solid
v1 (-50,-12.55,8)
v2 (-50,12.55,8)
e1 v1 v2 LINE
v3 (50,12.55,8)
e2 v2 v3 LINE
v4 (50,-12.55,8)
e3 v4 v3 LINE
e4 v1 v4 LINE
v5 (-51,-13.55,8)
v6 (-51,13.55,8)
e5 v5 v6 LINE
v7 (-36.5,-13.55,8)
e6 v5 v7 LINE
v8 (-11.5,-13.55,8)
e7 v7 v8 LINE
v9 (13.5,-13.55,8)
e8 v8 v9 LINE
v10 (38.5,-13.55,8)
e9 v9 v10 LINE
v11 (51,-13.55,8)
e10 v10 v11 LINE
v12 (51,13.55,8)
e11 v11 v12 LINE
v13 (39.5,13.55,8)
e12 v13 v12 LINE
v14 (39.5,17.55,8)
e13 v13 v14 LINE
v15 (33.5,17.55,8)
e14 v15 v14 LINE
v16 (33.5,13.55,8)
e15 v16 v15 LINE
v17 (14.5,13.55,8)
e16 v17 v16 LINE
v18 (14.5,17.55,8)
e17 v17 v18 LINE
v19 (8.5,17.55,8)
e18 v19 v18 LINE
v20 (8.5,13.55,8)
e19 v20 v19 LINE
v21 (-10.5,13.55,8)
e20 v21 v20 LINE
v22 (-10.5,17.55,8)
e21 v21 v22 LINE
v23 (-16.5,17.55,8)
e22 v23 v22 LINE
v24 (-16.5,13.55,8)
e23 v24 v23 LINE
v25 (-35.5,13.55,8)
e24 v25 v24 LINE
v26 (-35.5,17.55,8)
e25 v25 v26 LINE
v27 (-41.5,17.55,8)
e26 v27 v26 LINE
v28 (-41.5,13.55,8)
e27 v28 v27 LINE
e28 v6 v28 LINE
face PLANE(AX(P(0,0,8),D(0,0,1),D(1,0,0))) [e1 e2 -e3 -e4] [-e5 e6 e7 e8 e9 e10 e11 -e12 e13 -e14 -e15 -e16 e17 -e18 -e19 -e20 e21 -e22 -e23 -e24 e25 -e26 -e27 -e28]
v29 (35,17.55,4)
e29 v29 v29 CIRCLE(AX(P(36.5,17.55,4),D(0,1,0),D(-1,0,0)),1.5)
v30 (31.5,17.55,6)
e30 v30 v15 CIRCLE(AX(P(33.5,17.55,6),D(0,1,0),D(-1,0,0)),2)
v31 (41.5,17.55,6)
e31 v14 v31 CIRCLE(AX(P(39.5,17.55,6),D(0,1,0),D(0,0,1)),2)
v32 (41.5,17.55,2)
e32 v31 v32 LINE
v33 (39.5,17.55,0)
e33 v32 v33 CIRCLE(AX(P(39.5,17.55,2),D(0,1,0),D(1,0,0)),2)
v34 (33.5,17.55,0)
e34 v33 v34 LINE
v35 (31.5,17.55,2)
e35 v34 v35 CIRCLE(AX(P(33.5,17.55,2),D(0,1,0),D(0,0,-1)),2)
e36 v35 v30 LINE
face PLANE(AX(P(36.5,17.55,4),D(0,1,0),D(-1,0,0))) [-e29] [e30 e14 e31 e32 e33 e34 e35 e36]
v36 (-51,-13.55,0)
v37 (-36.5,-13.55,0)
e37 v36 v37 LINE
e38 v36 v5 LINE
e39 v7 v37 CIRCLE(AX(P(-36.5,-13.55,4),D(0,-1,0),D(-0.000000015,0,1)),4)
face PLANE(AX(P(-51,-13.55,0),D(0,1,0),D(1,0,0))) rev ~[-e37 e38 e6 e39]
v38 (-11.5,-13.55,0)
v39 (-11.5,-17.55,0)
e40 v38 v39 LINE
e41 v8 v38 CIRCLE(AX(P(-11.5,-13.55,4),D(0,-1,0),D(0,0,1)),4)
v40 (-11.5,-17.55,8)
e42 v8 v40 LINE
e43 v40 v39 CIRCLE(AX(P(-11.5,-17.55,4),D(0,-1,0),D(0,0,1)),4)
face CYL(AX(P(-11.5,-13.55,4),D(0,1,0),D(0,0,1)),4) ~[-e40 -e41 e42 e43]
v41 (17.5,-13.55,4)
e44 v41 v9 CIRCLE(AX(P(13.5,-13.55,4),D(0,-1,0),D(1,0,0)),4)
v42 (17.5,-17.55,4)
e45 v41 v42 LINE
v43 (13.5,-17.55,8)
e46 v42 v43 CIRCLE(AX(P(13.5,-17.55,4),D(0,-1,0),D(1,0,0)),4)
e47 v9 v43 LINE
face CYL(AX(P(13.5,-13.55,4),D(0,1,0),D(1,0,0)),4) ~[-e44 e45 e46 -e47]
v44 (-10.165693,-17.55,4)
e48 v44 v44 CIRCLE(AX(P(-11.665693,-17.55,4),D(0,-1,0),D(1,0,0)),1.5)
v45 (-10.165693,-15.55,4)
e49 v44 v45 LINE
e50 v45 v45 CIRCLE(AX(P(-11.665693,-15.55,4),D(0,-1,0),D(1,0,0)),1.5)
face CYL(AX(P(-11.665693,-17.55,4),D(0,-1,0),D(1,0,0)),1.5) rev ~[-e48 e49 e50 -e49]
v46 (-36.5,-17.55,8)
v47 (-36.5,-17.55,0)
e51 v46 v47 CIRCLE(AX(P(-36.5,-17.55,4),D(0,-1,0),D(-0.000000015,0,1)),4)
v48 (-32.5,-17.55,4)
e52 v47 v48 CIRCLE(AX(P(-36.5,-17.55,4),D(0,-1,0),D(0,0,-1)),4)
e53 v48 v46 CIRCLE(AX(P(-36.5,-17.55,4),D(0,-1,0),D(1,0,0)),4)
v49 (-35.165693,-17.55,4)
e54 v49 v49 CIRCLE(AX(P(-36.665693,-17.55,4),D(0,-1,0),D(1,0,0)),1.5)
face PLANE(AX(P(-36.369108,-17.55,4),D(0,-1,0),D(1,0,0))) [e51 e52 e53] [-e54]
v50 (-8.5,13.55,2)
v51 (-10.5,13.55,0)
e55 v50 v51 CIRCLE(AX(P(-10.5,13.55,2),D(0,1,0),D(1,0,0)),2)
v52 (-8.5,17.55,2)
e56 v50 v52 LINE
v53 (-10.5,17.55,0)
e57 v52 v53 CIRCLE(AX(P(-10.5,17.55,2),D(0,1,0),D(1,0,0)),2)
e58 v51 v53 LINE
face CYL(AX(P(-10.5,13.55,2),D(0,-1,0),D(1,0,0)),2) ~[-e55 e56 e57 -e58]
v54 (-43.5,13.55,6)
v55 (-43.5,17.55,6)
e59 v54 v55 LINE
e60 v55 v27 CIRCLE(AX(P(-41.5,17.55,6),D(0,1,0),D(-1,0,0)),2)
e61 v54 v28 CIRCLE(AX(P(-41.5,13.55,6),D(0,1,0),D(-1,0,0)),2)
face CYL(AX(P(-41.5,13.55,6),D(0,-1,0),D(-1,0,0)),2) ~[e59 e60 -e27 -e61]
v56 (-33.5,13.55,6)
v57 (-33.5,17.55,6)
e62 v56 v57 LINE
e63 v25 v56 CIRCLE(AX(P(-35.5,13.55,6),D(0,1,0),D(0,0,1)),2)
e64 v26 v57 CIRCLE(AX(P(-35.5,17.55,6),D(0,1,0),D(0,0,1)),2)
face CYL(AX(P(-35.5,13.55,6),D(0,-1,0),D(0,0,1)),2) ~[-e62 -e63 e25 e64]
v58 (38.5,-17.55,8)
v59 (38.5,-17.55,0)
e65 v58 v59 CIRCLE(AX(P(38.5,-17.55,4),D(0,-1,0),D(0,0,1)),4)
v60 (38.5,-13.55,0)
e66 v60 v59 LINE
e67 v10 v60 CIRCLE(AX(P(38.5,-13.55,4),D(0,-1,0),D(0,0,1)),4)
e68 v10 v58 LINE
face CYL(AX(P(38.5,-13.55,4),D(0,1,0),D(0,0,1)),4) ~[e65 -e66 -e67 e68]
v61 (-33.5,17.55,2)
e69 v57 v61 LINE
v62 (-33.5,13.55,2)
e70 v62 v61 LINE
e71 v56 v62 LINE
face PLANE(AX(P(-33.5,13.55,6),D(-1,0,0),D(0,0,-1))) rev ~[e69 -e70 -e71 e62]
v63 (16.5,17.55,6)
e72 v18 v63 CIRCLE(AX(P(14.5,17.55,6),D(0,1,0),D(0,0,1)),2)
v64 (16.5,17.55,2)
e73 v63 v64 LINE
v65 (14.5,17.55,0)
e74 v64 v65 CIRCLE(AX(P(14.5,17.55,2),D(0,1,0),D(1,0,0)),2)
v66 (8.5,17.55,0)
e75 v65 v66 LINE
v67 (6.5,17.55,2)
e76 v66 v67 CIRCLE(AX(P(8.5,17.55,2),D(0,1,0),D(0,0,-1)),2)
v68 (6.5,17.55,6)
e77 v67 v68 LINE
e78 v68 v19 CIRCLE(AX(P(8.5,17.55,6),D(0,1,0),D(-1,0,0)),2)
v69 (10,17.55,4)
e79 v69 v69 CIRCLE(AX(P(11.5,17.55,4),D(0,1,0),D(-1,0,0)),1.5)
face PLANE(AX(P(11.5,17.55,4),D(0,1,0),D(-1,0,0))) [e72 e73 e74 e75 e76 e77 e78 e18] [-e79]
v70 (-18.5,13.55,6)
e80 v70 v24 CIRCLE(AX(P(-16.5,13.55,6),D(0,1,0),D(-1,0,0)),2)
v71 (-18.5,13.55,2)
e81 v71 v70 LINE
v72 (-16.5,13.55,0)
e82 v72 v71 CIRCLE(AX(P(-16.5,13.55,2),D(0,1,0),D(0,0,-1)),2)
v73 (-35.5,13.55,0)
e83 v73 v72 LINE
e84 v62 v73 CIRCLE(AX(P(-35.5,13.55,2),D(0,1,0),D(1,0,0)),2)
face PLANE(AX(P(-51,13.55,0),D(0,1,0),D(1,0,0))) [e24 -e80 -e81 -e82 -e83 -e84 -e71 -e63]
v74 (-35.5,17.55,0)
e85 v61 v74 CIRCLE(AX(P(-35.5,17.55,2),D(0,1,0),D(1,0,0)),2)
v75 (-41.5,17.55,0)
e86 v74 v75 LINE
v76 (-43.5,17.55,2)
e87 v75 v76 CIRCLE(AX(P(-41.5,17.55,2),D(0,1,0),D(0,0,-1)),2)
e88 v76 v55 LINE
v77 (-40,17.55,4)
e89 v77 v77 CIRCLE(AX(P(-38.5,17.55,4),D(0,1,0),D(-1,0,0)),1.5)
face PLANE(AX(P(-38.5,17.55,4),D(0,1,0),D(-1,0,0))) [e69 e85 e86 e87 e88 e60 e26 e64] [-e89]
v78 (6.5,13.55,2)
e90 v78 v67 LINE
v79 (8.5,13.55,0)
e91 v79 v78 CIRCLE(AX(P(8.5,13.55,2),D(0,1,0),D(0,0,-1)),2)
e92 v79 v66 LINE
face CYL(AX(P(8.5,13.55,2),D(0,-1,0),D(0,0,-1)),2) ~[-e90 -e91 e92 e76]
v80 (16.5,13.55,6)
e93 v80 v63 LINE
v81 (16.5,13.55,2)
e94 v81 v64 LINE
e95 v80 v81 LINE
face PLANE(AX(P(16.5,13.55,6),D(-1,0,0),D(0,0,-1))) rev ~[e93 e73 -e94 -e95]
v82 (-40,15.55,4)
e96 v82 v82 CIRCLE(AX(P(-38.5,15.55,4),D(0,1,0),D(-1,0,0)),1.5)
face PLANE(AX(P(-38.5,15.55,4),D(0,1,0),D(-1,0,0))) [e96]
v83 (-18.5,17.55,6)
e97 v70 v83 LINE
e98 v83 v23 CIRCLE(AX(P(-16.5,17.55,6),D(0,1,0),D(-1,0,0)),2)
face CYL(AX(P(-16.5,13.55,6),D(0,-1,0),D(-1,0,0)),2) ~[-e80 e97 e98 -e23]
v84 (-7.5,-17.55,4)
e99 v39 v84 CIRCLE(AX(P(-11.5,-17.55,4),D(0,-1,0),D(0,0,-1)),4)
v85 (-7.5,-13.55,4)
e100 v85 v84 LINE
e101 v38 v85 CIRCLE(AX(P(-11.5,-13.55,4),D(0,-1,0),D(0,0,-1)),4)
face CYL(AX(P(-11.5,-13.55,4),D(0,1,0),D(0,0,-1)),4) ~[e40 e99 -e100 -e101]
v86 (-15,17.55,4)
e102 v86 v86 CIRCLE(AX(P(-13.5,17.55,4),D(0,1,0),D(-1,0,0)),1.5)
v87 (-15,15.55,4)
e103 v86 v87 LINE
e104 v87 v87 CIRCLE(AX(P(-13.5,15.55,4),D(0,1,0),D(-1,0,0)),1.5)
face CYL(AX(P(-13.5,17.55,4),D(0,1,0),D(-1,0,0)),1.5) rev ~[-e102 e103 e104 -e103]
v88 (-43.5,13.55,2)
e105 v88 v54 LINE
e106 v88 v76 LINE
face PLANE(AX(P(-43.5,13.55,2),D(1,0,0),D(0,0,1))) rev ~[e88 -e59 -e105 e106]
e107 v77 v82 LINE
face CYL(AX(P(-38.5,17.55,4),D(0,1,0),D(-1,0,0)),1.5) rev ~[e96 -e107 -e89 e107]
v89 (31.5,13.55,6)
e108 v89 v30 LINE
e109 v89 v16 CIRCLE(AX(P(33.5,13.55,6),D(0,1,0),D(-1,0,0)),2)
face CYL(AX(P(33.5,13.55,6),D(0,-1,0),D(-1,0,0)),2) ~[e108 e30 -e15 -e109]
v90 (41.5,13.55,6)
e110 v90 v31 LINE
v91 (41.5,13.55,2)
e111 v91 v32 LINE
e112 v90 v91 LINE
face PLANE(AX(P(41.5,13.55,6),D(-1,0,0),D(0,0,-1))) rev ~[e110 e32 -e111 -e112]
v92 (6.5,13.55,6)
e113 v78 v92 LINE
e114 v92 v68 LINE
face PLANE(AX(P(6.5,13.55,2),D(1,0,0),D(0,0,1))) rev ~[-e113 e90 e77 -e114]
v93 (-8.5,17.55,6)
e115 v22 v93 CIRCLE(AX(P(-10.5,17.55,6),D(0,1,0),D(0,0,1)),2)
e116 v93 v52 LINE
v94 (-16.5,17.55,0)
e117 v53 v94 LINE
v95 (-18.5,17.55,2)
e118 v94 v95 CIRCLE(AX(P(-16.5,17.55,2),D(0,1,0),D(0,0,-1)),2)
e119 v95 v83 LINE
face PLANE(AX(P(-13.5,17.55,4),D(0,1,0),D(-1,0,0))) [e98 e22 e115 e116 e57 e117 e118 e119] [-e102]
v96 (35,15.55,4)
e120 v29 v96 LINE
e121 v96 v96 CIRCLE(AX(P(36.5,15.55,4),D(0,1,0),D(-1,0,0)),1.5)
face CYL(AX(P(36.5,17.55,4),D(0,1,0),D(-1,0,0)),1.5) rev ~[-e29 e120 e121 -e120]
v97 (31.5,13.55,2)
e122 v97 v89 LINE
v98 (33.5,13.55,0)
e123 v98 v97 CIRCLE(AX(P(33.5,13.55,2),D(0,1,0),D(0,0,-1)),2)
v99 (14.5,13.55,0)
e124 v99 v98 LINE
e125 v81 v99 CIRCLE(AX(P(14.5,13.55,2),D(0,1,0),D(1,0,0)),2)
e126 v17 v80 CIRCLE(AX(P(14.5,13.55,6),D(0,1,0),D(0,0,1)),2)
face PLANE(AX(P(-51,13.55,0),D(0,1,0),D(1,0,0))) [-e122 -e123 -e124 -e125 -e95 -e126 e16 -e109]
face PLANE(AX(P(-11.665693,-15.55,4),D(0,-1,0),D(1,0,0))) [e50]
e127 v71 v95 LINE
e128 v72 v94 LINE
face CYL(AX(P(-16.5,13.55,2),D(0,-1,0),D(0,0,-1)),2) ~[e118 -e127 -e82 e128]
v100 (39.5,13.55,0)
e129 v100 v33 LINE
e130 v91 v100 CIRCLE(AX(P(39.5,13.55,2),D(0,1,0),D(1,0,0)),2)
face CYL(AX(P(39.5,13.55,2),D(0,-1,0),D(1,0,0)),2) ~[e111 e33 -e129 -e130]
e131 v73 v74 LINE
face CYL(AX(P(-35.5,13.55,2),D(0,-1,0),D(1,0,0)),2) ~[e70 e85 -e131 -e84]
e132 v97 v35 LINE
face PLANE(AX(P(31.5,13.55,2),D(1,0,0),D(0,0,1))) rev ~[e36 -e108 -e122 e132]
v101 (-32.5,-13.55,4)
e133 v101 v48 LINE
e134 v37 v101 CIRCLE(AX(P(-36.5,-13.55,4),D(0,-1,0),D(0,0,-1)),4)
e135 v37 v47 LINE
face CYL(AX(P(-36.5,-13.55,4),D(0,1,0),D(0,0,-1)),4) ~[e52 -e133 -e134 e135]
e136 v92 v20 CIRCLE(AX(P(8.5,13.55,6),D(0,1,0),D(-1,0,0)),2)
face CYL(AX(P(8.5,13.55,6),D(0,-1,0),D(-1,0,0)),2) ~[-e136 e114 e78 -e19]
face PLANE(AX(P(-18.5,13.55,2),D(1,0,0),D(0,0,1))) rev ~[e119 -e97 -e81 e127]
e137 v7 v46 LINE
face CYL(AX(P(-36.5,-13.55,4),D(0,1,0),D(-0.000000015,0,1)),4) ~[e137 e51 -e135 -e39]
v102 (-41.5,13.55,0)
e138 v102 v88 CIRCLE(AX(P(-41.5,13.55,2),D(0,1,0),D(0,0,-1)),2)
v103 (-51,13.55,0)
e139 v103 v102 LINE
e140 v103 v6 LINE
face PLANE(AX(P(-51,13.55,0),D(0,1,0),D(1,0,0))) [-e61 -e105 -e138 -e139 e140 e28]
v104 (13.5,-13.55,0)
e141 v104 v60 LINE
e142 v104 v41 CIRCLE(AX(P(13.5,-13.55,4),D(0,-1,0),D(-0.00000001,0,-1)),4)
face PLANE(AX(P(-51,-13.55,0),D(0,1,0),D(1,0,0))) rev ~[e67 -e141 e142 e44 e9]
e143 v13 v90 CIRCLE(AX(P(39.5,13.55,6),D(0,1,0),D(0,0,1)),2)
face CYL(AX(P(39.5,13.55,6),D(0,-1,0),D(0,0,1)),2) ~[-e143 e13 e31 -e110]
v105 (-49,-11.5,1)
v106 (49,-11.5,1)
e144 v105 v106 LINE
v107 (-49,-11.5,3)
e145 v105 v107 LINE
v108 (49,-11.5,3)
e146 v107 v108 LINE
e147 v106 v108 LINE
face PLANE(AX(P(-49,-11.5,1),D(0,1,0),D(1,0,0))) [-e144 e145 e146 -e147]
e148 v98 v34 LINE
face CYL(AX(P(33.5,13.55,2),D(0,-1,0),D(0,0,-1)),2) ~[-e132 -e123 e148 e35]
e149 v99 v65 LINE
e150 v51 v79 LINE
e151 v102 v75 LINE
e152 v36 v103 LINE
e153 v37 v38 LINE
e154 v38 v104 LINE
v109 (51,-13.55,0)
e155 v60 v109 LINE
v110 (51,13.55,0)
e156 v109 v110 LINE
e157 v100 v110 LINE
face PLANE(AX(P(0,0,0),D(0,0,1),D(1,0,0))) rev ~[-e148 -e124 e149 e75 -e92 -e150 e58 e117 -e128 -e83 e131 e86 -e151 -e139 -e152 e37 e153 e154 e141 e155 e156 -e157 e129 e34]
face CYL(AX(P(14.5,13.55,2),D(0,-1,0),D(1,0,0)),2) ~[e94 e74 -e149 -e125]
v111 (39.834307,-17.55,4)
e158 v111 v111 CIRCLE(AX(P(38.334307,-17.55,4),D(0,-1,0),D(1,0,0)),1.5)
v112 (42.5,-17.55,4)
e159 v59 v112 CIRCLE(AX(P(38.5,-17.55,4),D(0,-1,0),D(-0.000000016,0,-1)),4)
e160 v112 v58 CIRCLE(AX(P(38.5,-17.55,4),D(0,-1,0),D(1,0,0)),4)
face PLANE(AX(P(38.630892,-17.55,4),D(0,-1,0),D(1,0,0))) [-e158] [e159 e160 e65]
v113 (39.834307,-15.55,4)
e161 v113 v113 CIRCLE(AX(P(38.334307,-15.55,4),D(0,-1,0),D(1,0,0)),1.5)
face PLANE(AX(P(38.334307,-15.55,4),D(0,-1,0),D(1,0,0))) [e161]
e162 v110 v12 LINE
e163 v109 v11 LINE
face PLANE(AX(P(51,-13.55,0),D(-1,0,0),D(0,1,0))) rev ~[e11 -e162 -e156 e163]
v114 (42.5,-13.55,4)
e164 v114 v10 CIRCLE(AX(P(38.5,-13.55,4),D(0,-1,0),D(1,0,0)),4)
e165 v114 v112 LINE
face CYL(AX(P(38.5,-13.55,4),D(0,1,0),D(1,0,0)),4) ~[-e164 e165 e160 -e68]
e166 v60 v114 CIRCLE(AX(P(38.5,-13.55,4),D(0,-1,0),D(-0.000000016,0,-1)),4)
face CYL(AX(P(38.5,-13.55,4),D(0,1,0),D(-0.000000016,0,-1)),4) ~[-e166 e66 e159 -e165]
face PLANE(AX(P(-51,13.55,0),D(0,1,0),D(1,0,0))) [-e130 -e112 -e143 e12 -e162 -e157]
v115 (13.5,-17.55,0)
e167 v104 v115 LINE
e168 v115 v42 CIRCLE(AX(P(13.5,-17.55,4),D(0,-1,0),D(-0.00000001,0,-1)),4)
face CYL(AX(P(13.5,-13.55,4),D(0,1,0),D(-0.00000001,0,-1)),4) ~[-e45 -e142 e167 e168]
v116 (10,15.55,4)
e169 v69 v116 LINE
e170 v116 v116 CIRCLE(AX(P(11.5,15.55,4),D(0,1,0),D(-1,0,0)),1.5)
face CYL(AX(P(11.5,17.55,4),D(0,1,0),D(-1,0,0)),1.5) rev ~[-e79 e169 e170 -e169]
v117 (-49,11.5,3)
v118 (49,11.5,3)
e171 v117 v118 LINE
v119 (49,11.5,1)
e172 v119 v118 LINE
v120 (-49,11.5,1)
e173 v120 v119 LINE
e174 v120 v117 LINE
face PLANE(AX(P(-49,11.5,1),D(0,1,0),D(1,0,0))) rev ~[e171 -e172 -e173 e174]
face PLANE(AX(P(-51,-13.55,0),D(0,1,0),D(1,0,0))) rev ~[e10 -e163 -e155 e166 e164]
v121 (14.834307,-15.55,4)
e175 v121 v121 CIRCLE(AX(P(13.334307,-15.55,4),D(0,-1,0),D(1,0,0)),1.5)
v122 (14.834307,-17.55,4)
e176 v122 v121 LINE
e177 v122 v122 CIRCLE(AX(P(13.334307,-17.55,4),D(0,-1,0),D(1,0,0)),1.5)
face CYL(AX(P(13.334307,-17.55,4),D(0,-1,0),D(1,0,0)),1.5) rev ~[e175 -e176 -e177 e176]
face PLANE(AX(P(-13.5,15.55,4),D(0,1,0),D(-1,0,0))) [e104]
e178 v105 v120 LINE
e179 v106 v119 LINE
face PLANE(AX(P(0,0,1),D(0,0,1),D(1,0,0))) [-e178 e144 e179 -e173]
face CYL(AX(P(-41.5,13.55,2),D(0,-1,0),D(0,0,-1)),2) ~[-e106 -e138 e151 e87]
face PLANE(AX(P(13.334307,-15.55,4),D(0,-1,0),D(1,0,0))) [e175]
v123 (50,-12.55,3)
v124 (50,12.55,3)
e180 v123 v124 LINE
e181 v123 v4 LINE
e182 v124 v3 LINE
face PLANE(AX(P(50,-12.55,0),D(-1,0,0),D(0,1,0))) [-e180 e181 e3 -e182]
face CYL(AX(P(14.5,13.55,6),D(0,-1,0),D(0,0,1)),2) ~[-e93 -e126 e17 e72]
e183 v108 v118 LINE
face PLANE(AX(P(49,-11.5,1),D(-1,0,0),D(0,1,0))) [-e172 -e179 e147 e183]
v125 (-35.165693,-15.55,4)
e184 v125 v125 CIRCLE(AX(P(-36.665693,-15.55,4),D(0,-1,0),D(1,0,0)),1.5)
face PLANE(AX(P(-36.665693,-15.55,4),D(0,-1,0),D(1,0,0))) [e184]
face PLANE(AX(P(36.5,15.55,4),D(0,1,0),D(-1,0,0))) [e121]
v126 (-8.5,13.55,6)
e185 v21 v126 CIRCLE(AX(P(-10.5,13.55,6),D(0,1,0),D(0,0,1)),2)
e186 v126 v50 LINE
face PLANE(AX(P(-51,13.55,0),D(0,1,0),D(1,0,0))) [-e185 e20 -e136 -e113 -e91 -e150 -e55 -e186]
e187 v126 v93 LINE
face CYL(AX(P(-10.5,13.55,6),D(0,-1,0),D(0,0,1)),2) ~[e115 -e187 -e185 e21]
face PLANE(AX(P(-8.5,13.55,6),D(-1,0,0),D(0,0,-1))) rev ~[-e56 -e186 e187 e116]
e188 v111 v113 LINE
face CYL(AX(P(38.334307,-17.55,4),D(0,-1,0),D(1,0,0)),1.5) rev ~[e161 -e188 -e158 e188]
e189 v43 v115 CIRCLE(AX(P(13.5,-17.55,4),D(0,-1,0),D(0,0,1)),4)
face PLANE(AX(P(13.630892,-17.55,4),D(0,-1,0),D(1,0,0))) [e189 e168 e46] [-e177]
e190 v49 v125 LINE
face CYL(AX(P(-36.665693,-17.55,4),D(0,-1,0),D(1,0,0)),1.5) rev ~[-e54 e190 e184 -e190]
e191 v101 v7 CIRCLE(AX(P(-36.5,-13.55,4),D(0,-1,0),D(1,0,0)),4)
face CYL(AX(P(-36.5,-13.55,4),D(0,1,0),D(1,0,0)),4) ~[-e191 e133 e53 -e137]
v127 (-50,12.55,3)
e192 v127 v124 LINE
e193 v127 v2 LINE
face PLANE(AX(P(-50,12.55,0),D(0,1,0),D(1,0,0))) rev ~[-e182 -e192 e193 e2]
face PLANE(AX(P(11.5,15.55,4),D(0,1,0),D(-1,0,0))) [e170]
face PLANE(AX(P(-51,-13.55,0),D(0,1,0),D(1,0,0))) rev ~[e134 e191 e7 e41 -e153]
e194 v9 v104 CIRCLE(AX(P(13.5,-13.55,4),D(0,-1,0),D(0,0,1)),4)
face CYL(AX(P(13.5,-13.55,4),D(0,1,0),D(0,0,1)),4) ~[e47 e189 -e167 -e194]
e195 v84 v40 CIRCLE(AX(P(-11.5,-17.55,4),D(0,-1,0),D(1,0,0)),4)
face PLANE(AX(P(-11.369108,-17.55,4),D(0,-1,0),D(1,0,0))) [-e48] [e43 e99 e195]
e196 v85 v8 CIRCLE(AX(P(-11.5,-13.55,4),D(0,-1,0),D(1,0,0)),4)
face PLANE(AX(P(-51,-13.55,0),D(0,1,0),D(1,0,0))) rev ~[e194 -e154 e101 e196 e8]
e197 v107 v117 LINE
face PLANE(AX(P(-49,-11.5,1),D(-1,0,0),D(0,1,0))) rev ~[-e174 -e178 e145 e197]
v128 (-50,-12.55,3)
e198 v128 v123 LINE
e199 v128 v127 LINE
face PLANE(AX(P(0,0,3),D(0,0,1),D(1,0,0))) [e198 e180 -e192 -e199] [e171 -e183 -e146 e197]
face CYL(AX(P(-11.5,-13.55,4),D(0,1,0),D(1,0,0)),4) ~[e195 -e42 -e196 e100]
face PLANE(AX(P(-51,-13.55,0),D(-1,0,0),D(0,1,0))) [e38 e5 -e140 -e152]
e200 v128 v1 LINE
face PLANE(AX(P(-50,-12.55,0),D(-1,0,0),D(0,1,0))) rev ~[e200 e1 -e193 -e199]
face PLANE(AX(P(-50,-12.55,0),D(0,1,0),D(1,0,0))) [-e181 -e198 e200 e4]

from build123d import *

# Parameters (mm, degrees)
F0_W      = 102
F0_H      = 27.1
F0_W_2    = 100
F0_H_2    = 25.1
F1_DEPTH  = 8
F2_DEPTH  = 1
F3_W      = 100
F3_H      = 25.1
F3_W_2    = 98
F3_H_2    = 23
F4_DEPTH  = 2
F6_DEPTH  = 4
F7_R      = 1.5
F8_DEPTH  = 2
F10_DEPTH = 4
F11_R     = 1.5
F12_DEPTH = 2


# Not quite as in the source:
# - a feature names something its author has since deleted; it is built from what else it names


with BuildPart() as f1:
    # F0 (on Top) → F1 (new body)
    with BuildSketch(Plane.XY):
        Rectangle(F0_W, F0_H)
        Rectangle(F0_W_2, F0_H_2, mode=Mode.SUBTRACT)
    extrude(amount=F1_DEPTH)

    # F0 (on Top) → F2 (join)
    with BuildSketch(Plane.XY):
        Rectangle(F0_W_2, F0_H_2)
    extrude(amount=F2_DEPTH)

    # F3 (on face) → F4 (join)
    with BuildSketch(Plane.XY.offset(1)):
        Rectangle(F3_W, F3_H)
        Rectangle(F3_W_2, F3_H_2, mode=Mode.SUBTRACT)
    extrude(amount=F4_DEPTH)

    # F5 (on face) → F6 (join)
    with BuildSketch(Plane.XZ.offset(13.55)):
        with BuildLine():
            ThreePointArc((-36.5, 0), (-33.6715728753, 1.1715728753), (-32.5, 4))
            ThreePointArc((-32.5, 4), (-33.6715728968, 6.8284271463), (-36.5000000611, 8))
            ThreePointArc((-36.5000000611, 8), (-40.5, 3.9999999695), (-36.5, 0))
        make_face()
        with BuildLine():
            ThreePointArc((-7.5, 4), (-8.6715728753, 6.8284271247), (-11.5, 8))
            ThreePointArc((-11.5, 8), (-15.5, 4), (-11.5, 0))
            ThreePointArc((-11.5, 0), (-8.6715728753, 1.1715728753), (-7.5, 4))
        make_face()
        with BuildLine():
            ThreePointArc((17.5, 4), (16.3284271247, 6.8284271247), (13.5, 8))
            ThreePointArc((13.5, 8), (9.5, 4.0000000201), (13.4999999598, 0))
            ThreePointArc((13.4999999598, 0), (16.3284271105, 1.171572861), (17.5, 4))
        make_face()
        with BuildLine():
            ThreePointArc((42.5, 4), (41.3284271247, 6.8284271247), (38.5, 8))
            ThreePointArc((38.5, 8), (34.5, 4.0000000325), (38.499999935, 0))
            ThreePointArc((38.499999935, 0), (41.3284271017, 1.1715728523), (42.5, 4))
        make_face()
    extrude(amount=F6_DEPTH)

    # F7 (on face) → F8 (cut)
    with BuildSketch(Plane.XZ.offset(17.55)):
        with Locations((-36.6656929255, 4)):
            Circle(F7_R)
        with Locations((-11.6656929255, 4)):
            Circle(F7_R)
        with Locations((13.3343070745, 4)):
            Circle(F7_R)
        with Locations((38.3343070745, 4)):
            Circle(F7_R)
    extrude(amount=-F8_DEPTH, mode=Mode.SUBTRACT)

    # F9 (on face) → F10 (join)
    with BuildSketch(Plane(origin=(0, 13.55, 0), x_dir=(-1, 0, 0), z_dir=(0, 1, 0))):
        with BuildLine():
            Line((-39.5, 0), (-33.5, 0))
            ThreePointArc((-33.5, 0), (-32.0857864376, 0.5857864376), (-31.5, 2))
            Line((-31.5, 2), (-31.5, 6))
            ThreePointArc((-31.5, 6), (-32.0857864376, 7.4142135624), (-33.5, 8))
            Line((-33.5, 8), (-39.5, 8))
            ThreePointArc((-39.5, 8), (-40.9142135624, 7.4142135624), (-41.5, 6))
            Line((-41.5, 6), (-41.5, 2))
            ThreePointArc((-41.5, 2), (-40.9142135624, 0.5857864376), (-39.5, 0))
        make_face()
        with BuildLine():
            ThreePointArc((-16.5, 2), (-15.9142135624, 0.5857864376), (-14.5, 0))
            Line((-14.5, 0), (-8.5, 0))
            ThreePointArc((-8.5, 0), (-7.0857864376, 0.5857864376), (-6.5, 2))
            Line((-6.5, 2), (-6.5, 6))
            ThreePointArc((-6.5, 6), (-7.0857864376, 7.4142135624), (-8.5, 8))
            Line((-8.5, 8), (-14.5, 8))
            ThreePointArc((-14.5, 8), (-15.9142135624, 7.4142135624), (-16.5, 6))
            Line((-16.5, 6), (-16.5, 2))
        make_face()
        with BuildLine():
            ThreePointArc((8.5, 2), (9.0857864376, 0.5857864376), (10.5, 0))
            Line((10.5, 0), (16.5, 0))
            ThreePointArc((16.5, 0), (17.9142135624, 0.5857864376), (18.5, 2))
            Line((18.5, 2), (18.5, 6))
            ThreePointArc((18.5, 6), (17.9142135624, 7.4142135624), (16.5, 8))
            Line((16.5, 8), (10.5, 8))
            ThreePointArc((10.5, 8), (9.0857864376, 7.4142135624), (8.5, 6))
            Line((8.5, 6), (8.5, 2))
        make_face()
        with BuildLine():
            ThreePointArc((33.5, 2), (34.0857864376, 0.5857864376), (35.5, 0))
            Line((35.5, 0), (41.5, 0))
            ThreePointArc((41.5, 0), (42.9142135624, 0.5857864376), (43.5, 2))
            Line((43.5, 2), (43.5, 6))
            ThreePointArc((43.5, 6), (42.9142135624, 7.4142135624), (41.5, 8))
            Line((41.5, 8), (35.5, 8))
            ThreePointArc((35.5, 8), (34.0857864376, 7.4142135624), (33.5, 6))
            Line((33.5, 6), (33.5, 2))
        make_face()
    extrude(amount=F10_DEPTH)

    # F11 (on face) → F12 (cut)
    with BuildSketch(Plane(origin=(0, 17.55, 0), x_dir=(-1, 0, 0), z_dir=(0, 1, 0))):
        with Locations((-36.5, 4)):
            Circle(F11_R)
        with Locations((-11.5, 4)):
            Circle(F11_R)
        with Locations((13.5, 4)):
            Circle(F11_R)
        with Locations((38.5, 4)):
            Circle(F11_R)
    extrude(amount=-F12_DEPTH, mode=Mode.SUBTRACT)


solid = f1.part
